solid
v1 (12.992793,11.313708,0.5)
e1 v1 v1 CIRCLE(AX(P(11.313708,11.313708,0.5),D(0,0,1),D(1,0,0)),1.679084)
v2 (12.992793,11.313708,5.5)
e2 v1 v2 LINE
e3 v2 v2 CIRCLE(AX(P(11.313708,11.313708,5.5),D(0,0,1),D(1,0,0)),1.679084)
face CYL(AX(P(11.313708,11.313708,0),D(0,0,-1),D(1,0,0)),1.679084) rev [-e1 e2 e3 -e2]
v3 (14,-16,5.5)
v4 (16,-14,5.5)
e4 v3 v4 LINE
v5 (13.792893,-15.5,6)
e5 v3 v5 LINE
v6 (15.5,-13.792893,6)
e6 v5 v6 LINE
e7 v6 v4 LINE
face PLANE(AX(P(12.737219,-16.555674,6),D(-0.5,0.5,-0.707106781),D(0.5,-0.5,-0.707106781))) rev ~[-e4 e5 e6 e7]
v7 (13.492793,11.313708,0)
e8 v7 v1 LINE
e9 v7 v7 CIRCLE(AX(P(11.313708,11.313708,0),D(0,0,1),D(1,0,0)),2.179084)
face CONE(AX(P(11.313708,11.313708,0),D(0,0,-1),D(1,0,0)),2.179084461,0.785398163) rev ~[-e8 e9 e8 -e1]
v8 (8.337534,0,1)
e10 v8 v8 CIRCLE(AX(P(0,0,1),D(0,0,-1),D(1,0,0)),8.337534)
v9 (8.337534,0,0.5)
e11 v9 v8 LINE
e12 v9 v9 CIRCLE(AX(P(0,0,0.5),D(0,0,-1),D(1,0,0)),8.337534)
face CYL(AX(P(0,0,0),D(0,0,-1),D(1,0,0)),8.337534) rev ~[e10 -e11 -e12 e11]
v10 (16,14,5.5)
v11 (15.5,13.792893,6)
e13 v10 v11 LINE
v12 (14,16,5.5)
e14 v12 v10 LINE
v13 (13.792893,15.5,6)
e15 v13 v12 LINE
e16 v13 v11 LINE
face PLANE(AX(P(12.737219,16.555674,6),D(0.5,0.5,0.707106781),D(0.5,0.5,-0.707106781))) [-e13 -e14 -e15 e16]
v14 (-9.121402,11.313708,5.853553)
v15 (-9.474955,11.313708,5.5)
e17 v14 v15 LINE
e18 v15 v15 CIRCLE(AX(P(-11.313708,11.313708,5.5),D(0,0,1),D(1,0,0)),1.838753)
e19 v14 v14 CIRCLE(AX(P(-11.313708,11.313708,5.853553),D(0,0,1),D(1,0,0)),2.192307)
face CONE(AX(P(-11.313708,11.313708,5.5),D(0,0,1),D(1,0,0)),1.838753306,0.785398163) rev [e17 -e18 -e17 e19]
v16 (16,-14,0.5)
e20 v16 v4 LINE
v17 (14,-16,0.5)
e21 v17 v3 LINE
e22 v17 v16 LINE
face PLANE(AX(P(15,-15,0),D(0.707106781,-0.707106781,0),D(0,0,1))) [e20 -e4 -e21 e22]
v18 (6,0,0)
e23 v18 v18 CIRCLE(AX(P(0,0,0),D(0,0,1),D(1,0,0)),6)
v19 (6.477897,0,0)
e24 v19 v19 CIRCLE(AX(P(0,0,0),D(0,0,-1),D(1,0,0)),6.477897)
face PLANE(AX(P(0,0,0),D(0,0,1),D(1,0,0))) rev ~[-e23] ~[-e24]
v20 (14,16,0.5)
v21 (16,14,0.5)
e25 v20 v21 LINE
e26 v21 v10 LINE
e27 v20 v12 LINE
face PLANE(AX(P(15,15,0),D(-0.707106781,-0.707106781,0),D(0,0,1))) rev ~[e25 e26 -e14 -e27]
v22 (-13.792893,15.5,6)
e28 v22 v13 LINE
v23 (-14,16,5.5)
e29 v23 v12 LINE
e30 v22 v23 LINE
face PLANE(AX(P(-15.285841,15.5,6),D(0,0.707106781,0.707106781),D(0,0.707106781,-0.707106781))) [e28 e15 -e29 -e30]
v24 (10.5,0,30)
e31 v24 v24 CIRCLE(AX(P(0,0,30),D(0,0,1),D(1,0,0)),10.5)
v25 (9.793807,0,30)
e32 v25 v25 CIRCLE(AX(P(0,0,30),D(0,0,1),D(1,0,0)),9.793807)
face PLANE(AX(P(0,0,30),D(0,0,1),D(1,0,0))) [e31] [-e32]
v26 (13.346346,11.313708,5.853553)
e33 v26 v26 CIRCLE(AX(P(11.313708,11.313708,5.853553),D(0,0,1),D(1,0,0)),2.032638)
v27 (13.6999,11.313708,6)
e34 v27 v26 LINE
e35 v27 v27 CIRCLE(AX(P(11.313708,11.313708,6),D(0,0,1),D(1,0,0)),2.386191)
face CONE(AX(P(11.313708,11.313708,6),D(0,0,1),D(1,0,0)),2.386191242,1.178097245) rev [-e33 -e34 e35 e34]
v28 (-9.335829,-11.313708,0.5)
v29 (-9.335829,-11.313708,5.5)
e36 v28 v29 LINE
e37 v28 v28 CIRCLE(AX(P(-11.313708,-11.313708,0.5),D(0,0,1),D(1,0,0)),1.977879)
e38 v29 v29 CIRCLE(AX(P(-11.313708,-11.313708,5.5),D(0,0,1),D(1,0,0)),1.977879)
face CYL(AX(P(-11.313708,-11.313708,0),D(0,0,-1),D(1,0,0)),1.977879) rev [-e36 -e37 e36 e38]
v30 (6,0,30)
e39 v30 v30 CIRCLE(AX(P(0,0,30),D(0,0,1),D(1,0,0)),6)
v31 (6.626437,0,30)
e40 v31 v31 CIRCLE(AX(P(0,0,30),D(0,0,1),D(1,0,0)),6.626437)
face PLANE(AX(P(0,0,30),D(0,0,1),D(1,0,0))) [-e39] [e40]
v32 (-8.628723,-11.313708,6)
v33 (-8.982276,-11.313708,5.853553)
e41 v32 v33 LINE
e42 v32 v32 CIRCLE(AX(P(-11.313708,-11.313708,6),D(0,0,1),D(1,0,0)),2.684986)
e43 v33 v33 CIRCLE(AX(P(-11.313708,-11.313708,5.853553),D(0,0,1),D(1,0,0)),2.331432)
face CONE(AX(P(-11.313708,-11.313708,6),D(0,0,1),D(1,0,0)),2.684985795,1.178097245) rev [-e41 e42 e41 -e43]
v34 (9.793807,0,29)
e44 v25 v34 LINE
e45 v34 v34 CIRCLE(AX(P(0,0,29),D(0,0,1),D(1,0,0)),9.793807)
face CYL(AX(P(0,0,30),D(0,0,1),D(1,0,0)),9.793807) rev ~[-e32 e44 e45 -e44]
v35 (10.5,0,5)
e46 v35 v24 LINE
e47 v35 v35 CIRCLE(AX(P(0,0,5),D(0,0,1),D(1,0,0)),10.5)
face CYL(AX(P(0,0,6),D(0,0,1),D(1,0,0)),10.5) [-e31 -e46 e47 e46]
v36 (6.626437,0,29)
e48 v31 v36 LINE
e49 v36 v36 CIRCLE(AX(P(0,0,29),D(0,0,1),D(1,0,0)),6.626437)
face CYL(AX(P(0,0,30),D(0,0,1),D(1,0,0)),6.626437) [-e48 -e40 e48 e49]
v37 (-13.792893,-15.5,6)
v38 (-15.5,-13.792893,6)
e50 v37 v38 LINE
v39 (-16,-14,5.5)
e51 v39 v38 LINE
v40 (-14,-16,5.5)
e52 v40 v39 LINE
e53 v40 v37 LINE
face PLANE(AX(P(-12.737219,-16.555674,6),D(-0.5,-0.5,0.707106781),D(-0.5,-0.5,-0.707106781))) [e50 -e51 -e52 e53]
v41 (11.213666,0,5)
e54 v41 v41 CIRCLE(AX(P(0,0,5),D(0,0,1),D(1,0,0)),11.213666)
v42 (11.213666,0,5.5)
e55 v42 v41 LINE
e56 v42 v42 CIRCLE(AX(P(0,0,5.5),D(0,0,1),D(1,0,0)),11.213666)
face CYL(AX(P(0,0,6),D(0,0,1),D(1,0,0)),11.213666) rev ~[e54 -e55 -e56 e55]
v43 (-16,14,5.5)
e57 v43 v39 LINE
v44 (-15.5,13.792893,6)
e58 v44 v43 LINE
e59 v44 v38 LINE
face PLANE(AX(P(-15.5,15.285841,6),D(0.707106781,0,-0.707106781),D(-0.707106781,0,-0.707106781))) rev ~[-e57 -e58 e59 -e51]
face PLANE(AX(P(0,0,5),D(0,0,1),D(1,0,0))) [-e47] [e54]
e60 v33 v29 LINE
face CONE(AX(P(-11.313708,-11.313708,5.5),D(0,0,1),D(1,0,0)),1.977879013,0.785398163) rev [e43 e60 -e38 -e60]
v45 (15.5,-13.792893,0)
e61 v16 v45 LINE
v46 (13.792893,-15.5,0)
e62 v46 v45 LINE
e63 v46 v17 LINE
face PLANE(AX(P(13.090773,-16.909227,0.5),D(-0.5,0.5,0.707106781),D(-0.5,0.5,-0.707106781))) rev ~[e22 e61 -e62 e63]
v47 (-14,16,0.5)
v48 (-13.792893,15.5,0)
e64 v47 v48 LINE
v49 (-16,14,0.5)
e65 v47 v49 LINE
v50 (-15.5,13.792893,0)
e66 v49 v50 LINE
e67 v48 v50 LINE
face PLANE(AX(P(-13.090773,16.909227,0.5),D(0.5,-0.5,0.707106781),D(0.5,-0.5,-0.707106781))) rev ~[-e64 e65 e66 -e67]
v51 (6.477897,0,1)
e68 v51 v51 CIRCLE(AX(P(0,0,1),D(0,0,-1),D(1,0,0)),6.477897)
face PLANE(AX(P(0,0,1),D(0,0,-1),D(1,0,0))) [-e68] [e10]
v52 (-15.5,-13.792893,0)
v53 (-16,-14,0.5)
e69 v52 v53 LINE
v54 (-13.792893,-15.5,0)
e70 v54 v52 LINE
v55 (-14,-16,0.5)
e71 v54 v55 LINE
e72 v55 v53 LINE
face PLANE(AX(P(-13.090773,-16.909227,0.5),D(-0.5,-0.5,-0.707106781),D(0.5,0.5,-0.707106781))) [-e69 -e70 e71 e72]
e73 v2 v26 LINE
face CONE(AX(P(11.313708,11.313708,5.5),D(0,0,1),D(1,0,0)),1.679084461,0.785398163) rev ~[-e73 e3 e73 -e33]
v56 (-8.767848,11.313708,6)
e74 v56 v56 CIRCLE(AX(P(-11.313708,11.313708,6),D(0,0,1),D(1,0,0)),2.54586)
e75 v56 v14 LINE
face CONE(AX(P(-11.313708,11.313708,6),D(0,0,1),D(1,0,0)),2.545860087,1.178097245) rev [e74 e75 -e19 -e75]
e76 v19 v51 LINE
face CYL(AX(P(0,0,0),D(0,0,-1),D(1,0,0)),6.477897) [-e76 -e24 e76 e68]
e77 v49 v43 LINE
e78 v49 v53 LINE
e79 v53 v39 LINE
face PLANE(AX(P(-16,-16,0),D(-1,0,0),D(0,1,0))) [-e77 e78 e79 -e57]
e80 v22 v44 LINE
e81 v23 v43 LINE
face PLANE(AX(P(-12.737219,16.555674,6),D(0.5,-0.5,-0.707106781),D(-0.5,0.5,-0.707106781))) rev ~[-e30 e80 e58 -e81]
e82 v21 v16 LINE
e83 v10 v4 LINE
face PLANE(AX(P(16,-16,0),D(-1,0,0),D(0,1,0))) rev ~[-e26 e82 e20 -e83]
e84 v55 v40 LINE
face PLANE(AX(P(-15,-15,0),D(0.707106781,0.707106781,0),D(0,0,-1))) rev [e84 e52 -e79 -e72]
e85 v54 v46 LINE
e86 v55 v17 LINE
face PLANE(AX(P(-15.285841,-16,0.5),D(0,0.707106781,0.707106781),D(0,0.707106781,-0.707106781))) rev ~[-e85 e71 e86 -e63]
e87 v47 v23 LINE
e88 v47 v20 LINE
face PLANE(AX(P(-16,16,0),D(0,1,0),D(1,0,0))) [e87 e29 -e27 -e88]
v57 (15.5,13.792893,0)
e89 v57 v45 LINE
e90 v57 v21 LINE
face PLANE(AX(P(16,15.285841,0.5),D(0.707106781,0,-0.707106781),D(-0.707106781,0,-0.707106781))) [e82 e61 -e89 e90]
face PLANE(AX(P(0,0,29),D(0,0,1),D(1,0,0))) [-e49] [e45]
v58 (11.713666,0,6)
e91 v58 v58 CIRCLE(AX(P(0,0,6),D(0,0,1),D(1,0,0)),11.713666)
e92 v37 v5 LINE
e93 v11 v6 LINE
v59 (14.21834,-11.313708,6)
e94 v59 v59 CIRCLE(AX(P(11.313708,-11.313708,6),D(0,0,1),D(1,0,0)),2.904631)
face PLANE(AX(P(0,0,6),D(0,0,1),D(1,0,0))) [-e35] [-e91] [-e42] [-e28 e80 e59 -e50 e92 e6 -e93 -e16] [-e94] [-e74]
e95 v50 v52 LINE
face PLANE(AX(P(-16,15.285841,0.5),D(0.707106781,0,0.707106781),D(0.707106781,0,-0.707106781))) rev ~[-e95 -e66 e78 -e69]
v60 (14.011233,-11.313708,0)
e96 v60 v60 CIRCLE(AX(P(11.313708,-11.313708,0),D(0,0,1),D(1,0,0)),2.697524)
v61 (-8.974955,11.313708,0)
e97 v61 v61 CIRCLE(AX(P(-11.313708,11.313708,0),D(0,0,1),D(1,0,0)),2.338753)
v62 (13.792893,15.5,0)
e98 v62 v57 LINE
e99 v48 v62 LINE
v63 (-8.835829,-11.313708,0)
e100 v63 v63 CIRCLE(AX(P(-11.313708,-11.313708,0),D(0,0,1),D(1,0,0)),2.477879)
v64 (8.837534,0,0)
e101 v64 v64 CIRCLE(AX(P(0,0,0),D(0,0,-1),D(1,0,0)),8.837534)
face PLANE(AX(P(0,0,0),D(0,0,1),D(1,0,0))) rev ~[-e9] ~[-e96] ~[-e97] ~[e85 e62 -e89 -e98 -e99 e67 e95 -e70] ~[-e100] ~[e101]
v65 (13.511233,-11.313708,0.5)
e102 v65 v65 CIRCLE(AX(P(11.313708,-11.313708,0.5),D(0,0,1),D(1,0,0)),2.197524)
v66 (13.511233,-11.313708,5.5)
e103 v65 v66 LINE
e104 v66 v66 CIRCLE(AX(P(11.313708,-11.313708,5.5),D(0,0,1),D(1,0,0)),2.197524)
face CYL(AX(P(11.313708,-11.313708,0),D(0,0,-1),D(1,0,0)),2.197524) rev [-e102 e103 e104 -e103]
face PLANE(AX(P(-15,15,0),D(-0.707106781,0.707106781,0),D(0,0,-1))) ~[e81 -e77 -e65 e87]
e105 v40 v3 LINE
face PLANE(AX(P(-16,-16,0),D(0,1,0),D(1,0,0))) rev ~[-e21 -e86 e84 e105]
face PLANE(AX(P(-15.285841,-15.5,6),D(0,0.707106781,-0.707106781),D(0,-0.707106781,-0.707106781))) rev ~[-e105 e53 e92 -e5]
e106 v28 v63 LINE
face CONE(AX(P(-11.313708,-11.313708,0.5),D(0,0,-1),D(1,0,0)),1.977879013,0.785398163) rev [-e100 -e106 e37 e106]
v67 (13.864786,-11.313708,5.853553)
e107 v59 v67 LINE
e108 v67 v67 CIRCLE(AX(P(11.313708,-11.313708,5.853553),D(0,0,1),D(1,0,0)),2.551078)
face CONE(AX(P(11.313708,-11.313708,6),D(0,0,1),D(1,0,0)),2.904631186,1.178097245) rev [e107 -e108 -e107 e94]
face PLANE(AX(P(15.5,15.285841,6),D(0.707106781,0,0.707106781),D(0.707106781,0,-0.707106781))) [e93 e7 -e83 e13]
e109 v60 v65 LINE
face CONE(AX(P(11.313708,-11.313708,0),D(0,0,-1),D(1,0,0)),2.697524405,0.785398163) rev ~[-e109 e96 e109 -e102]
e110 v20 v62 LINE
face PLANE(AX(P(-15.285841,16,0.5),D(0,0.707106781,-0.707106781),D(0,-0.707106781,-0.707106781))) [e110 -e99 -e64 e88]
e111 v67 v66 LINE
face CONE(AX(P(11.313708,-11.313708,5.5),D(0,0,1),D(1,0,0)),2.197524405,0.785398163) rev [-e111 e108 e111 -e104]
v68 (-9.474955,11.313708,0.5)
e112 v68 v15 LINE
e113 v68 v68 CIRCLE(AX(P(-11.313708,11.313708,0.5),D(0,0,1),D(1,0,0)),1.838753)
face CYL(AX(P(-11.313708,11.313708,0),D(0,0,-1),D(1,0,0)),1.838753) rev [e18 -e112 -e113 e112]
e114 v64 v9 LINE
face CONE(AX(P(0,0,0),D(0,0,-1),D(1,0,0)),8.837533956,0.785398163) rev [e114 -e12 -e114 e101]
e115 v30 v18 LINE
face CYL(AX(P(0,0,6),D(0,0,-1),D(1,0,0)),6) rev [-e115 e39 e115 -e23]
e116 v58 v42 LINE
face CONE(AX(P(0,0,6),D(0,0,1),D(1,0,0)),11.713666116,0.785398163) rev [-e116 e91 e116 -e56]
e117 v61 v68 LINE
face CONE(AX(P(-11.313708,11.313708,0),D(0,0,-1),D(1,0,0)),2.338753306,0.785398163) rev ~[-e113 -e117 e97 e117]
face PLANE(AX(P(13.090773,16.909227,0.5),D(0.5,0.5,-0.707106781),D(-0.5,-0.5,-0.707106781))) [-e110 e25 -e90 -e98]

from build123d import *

# Parameters (mm, degrees)
F0_W          = 32
F0_H          = 32
F0_R          = 1.9778790134
F0_R_2        = 2.1975244048
F0_R_3        = 1.8387533056
F0_R_4        = 6
F0_R_5        = 1.6790844608
F1_DEPTH      = 6
F2_R          = 10.5
F2_R_2        = 6
F3_DEPTH      = 24
F4_SIZE       = 2
F5_R          = 11.2136661157
F5_R_2        = 10.5
F6_DEPTH      = 1
F7_R          = 9.7938073019
F7_R_2        = 6.6264369037
F8_DEPTH      = 1
F9_SIZE       = 0.5
F10_R         = 8.3375339565
F10_R_2       = 6.4778965527
F11_DEPTH     = 1
F12_T1_DEPTH  = 30.571682988
F12_T3_DEPTH  = 5.4001101127
F12_T5_DEPTH  = 5.4001101127
F12_T7_DEPTH  = 30.571682988
F12_T9_DEPTH  = 5.4001101127
F12_T11_DEPTH = 5.4001101127


# Not quite as in the source:
# - a fillet or chamfer that OpenCascade refuses, or shapes differently, is made with other operations: its cross-section is extruded or revolved along the edge and cut away or added


with BuildPart() as f1:
    # F0 (on Top) → F1 (new body)
    with BuildSketch(Plane.XY):
        Rectangle(F0_W, F0_H)
        with Locations((-11.313708499, -11.313708499)):
            Circle(F0_R, mode=Mode.SUBTRACT)
        with Locations((11.313708499, -11.313708499)):
            Circle(F0_R_2, mode=Mode.SUBTRACT)
        with Locations((-11.313708499, 11.313708499)):
            Circle(F0_R_3, mode=Mode.SUBTRACT)
        Circle(F0_R_4, mode=Mode.SUBTRACT)
        with Locations((11.313708499, 11.313708499)):
            Circle(F0_R_5, mode=Mode.SUBTRACT)
    extrude(amount=F1_DEPTH)

    # F2 (on face) → F3 (join)
    with BuildSketch(Plane.XY.offset(6)):
        Circle(F2_R)
        Circle(F2_R_2, mode=Mode.SUBTRACT)
    extrude(amount=F3_DEPTH)

    # F4
    f4_edges = [f1.edges().sort_by_distance(p)[0] for p in [
        (-16, -16, 3),
        (16, -16, 3),
        (-16, 16, 3),
        (16, 16, 3),
    ]]
    chamfer(f4_edges, length=F4_SIZE)

    # F5 (on face) → F6 (cut)
    with BuildSketch(Plane.XY.offset(6)):
        Circle(F5_R)
        Circle(F5_R_2, mode=Mode.SUBTRACT)
    extrude(amount=-F6_DEPTH, mode=Mode.SUBTRACT)

    # F7 (on face) → F8 (cut)
    with BuildSketch(Plane.XY.offset(30)):
        Circle(F7_R)
        Circle(F7_R_2, mode=Mode.SUBTRACT)
    extrude(amount=-F8_DEPTH, mode=Mode.SUBTRACT)

    # F9
    f9_edges = [f1.edges().sort_by_distance(p)[0] for p in [
        (-13.291588, -11.313708, 6),
        (9.634624, 11.313708, 6),
        (9.116184, -11.313708, 6),
        (-13.152462, 11.313708, 6),
    ]]
    chamfer(f9_edges, length=F9_SIZE)

    # F10 (on face) → F11 (cut)
    with BuildSketch(Plane(origin=(0, 0, 0), x_dir=(1, 0, 0), z_dir=(0, 0, -1))):
        Circle(F10_R)
        Circle(F10_R_2, mode=Mode.SUBTRACT)
    extrude(amount=-F11_DEPTH, mode=Mode.SUBTRACT)

    # F12: chamfer of 0.5 on 26 edges, made by hand

    # F12_s2 → F12_t1 (cut)
    with BuildSketch(Plane.YZ.offset(-15.285841494)):
        Polygon((-16, 0.5), (-15.5, 0), (-16, 0), align=None)
        Polygon((16, 0.5), (15.5, 0), (16, 0), align=None)
        Polygon((-15.5, 6), (-16, 5.5), (-16, 6), align=None)
        Polygon((15.5, 6), (16, 5.5), (16, 6), align=None)
    extrude(amount=F12_T1_DEPTH, mode=Mode.SUBTRACT)

    # F12_s4 → F12_t3 (cut)
    with BuildSketch(Plane(origin=(1.9092272399, -1.9092272399, 0), x_dir=(0, 0, 1), z_dir=(-0.7071067812, 0.7071067812, 0))):
        Polygon((0.5, -21.2132034356), (0, -20.7132034356), (0, -21.2132034356), align=None)
        Polygon((6, -20.7132034356), (5.5, -21.2132034356), (6, -21.2132034356), align=None)
    extrude(amount=F12_T3_DEPTH, mode=Mode.SUBTRACT)

    # F12_s6 → F12_t5 (cut)
    with BuildSketch(Plane(origin=(-1.9092272399, -1.9092272399, 0), x_dir=(0, 0, 1), z_dir=(0.7071067812, 0.7071067812, 0))):
        Polygon((0.5, 21.2132034356), (0, 20.7132034356), (0, 21.2132034356), align=None)
        Polygon((6, 20.7132034356), (5.5, 21.2132034356), (6, 21.2132034356), align=None)
    extrude(amount=F12_T5_DEPTH, mode=Mode.SUBTRACT)

    # F12_s8 → F12_t7 (cut)
    with BuildSketch(Plane.XZ.offset(-15.285841494)):
        Polygon((-16, 0.5), (-15.5, 0), (-16, 0), align=None)
        Polygon((16, 0.5), (15.5, 0), (16, 0), align=None)
        Polygon((-15.5, 6), (-16, 5.5), (-16, 6), align=None)
        Polygon((15.5, 6), (16, 5.5), (16, 6), align=None)
    extrude(amount=F12_T7_DEPTH, mode=Mode.SUBTRACT)

    # F12_s10 → F12_t9 (cut)
    with BuildSketch(Plane(origin=(1.9092272399, 1.9092272399, 0), x_dir=(0, 0, 1), z_dir=(-0.7071067812, -0.7071067812, 0))):
        Polygon((0.5, 21.2132034356), (0, 20.7132034356), (0, 21.2132034356), align=None)
        Polygon((6, 20.7132034356), (5.5, 21.2132034356), (6, 21.2132034356), align=None)
    extrude(amount=F12_T9_DEPTH, mode=Mode.SUBTRACT)

    # F12_s12 → F12_t11 (cut)
    with BuildSketch(Plane(origin=(-1.9092272399, 1.9092272399, 0), x_dir=(0, 0, 1), z_dir=(0.7071067812, -0.7071067812, 0))):
        Polygon((0.5, -21.2132034356), (0, -20.7132034356), (0, -21.2132034356), align=None)
        Polygon((6, -20.7132034356), (5.5, -21.2132034356), (6, -21.2132034356), align=None)
    extrude(amount=F12_T11_DEPTH, mode=Mode.SUBTRACT)

    # F12_s13 → F12_t14 (revolve, cut)
    with BuildSketch(Plane.XZ.offset(11.313708499)):
        Polygon((-9.3358294856, 0.5), (-8.8358294856, 0), (-9.3358294856, 0), align=None)
    revolve(axis=Axis((-11.313708499, -11.313708499, 0), (0, 0, 1)), mode=Mode.SUBTRACT)

    # F12_s15 → F12_t16 (revolve, cut)
    with BuildSketch(Plane.XZ.offset(11.313708499)):
        Polygon((14.0112329038, 0), (13.5112329038, 0.5), (13.5112329038, 0), align=None)
    revolve(axis=Axis((11.313708499, -11.313708499, 0), (0, 0, 1)), mode=Mode.SUBTRACT)

    # F12_s17 → F12_t18 (revolve, cut)
    with BuildSketch(Plane.XZ):
        Polygon((8.8375339565, 0), (8.3375339565, 0.5), (8.3375339565, 0), align=None)
    revolve(axis=Axis((0, 0, 0), (0, 0, -1)), mode=Mode.SUBTRACT)

    # F12_s19 → F12_t20 (revolve, cut)
    with BuildSketch(Plane.XZ.offset(-11.313708499)):
        Polygon((-8.9749551934, 0), (-9.4749551934, 0.5), (-9.4749551934, 0), align=None)
    revolve(axis=Axis((-11.313708499, 11.313708499, 0), (0, 0, 1)), mode=Mode.SUBTRACT)

    # F12_s21 → F12_t22 (revolve, cut)
    with BuildSketch(Plane.XZ.offset(-11.313708499)):
        Polygon((13.4927929597, 0), (12.9927929597, 0.5), (12.9927929597, 0), align=None)
    revolve(axis=Axis((11.313708499, 11.313708499, 0), (0, 0, 1)), mode=Mode.SUBTRACT)

    # F12_s23 → F12_t24 (revolve, cut)
    with BuildSketch(Plane.XZ.offset(11.313708499)):
        Polygon((-8.6287227044, 6), (-8.982276095, 5.8535533906), (-8.8358294856, 6), align=None)
    revolve(axis=Axis((-11.313708499, -11.313708499, 6), (0, 0, 1)), mode=Mode.SUBTRACT)

    # F12_s25 → F12_t26 (revolve, cut)
    with BuildSketch(Plane.XZ):
        Polygon((11.7136661157, 6), (11.2136661157, 5.5), (11.2136661157, 6), align=None)
    revolve(axis=Axis((0, 0, 6), (0, 0, 1)), mode=Mode.SUBTRACT)

    # F12_s27 → F12_t28 (revolve, cut)
    with BuildSketch(Plane.XZ.offset(-11.313708499)):
        Polygon((13.6998997409, 6), (13.3463463503, 5.8535533906), (13.4927929597, 6), align=None)
    revolve(axis=Axis((11.313708499, 11.313708499, 6), (0, 0, 1)), mode=Mode.SUBTRACT)

    # F12_s29 → F12_t30 (revolve, cut)
    with BuildSketch(Plane.XZ.offset(11.313708499)):
        Polygon((14.218339685, 6), (13.8647862944, 5.8535533906), (14.0112329038, 6), align=None)
    revolve(axis=Axis((11.313708499, -11.313708499, 6), (0, 0, 1)), mode=Mode.SUBTRACT)

    # F12_s31 → F12_t32 (revolve, cut)
    with BuildSketch(Plane.XZ.offset(-11.313708499)):
        Polygon((-8.7678484122, 6), (-9.1214018028, 5.8535533906), (-8.9749551934, 6), align=None)
    revolve(axis=Axis((-11.313708499, 11.313708499, 6), (0, 0, 1)), mode=Mode.SUBTRACT)


solid = f1.part
